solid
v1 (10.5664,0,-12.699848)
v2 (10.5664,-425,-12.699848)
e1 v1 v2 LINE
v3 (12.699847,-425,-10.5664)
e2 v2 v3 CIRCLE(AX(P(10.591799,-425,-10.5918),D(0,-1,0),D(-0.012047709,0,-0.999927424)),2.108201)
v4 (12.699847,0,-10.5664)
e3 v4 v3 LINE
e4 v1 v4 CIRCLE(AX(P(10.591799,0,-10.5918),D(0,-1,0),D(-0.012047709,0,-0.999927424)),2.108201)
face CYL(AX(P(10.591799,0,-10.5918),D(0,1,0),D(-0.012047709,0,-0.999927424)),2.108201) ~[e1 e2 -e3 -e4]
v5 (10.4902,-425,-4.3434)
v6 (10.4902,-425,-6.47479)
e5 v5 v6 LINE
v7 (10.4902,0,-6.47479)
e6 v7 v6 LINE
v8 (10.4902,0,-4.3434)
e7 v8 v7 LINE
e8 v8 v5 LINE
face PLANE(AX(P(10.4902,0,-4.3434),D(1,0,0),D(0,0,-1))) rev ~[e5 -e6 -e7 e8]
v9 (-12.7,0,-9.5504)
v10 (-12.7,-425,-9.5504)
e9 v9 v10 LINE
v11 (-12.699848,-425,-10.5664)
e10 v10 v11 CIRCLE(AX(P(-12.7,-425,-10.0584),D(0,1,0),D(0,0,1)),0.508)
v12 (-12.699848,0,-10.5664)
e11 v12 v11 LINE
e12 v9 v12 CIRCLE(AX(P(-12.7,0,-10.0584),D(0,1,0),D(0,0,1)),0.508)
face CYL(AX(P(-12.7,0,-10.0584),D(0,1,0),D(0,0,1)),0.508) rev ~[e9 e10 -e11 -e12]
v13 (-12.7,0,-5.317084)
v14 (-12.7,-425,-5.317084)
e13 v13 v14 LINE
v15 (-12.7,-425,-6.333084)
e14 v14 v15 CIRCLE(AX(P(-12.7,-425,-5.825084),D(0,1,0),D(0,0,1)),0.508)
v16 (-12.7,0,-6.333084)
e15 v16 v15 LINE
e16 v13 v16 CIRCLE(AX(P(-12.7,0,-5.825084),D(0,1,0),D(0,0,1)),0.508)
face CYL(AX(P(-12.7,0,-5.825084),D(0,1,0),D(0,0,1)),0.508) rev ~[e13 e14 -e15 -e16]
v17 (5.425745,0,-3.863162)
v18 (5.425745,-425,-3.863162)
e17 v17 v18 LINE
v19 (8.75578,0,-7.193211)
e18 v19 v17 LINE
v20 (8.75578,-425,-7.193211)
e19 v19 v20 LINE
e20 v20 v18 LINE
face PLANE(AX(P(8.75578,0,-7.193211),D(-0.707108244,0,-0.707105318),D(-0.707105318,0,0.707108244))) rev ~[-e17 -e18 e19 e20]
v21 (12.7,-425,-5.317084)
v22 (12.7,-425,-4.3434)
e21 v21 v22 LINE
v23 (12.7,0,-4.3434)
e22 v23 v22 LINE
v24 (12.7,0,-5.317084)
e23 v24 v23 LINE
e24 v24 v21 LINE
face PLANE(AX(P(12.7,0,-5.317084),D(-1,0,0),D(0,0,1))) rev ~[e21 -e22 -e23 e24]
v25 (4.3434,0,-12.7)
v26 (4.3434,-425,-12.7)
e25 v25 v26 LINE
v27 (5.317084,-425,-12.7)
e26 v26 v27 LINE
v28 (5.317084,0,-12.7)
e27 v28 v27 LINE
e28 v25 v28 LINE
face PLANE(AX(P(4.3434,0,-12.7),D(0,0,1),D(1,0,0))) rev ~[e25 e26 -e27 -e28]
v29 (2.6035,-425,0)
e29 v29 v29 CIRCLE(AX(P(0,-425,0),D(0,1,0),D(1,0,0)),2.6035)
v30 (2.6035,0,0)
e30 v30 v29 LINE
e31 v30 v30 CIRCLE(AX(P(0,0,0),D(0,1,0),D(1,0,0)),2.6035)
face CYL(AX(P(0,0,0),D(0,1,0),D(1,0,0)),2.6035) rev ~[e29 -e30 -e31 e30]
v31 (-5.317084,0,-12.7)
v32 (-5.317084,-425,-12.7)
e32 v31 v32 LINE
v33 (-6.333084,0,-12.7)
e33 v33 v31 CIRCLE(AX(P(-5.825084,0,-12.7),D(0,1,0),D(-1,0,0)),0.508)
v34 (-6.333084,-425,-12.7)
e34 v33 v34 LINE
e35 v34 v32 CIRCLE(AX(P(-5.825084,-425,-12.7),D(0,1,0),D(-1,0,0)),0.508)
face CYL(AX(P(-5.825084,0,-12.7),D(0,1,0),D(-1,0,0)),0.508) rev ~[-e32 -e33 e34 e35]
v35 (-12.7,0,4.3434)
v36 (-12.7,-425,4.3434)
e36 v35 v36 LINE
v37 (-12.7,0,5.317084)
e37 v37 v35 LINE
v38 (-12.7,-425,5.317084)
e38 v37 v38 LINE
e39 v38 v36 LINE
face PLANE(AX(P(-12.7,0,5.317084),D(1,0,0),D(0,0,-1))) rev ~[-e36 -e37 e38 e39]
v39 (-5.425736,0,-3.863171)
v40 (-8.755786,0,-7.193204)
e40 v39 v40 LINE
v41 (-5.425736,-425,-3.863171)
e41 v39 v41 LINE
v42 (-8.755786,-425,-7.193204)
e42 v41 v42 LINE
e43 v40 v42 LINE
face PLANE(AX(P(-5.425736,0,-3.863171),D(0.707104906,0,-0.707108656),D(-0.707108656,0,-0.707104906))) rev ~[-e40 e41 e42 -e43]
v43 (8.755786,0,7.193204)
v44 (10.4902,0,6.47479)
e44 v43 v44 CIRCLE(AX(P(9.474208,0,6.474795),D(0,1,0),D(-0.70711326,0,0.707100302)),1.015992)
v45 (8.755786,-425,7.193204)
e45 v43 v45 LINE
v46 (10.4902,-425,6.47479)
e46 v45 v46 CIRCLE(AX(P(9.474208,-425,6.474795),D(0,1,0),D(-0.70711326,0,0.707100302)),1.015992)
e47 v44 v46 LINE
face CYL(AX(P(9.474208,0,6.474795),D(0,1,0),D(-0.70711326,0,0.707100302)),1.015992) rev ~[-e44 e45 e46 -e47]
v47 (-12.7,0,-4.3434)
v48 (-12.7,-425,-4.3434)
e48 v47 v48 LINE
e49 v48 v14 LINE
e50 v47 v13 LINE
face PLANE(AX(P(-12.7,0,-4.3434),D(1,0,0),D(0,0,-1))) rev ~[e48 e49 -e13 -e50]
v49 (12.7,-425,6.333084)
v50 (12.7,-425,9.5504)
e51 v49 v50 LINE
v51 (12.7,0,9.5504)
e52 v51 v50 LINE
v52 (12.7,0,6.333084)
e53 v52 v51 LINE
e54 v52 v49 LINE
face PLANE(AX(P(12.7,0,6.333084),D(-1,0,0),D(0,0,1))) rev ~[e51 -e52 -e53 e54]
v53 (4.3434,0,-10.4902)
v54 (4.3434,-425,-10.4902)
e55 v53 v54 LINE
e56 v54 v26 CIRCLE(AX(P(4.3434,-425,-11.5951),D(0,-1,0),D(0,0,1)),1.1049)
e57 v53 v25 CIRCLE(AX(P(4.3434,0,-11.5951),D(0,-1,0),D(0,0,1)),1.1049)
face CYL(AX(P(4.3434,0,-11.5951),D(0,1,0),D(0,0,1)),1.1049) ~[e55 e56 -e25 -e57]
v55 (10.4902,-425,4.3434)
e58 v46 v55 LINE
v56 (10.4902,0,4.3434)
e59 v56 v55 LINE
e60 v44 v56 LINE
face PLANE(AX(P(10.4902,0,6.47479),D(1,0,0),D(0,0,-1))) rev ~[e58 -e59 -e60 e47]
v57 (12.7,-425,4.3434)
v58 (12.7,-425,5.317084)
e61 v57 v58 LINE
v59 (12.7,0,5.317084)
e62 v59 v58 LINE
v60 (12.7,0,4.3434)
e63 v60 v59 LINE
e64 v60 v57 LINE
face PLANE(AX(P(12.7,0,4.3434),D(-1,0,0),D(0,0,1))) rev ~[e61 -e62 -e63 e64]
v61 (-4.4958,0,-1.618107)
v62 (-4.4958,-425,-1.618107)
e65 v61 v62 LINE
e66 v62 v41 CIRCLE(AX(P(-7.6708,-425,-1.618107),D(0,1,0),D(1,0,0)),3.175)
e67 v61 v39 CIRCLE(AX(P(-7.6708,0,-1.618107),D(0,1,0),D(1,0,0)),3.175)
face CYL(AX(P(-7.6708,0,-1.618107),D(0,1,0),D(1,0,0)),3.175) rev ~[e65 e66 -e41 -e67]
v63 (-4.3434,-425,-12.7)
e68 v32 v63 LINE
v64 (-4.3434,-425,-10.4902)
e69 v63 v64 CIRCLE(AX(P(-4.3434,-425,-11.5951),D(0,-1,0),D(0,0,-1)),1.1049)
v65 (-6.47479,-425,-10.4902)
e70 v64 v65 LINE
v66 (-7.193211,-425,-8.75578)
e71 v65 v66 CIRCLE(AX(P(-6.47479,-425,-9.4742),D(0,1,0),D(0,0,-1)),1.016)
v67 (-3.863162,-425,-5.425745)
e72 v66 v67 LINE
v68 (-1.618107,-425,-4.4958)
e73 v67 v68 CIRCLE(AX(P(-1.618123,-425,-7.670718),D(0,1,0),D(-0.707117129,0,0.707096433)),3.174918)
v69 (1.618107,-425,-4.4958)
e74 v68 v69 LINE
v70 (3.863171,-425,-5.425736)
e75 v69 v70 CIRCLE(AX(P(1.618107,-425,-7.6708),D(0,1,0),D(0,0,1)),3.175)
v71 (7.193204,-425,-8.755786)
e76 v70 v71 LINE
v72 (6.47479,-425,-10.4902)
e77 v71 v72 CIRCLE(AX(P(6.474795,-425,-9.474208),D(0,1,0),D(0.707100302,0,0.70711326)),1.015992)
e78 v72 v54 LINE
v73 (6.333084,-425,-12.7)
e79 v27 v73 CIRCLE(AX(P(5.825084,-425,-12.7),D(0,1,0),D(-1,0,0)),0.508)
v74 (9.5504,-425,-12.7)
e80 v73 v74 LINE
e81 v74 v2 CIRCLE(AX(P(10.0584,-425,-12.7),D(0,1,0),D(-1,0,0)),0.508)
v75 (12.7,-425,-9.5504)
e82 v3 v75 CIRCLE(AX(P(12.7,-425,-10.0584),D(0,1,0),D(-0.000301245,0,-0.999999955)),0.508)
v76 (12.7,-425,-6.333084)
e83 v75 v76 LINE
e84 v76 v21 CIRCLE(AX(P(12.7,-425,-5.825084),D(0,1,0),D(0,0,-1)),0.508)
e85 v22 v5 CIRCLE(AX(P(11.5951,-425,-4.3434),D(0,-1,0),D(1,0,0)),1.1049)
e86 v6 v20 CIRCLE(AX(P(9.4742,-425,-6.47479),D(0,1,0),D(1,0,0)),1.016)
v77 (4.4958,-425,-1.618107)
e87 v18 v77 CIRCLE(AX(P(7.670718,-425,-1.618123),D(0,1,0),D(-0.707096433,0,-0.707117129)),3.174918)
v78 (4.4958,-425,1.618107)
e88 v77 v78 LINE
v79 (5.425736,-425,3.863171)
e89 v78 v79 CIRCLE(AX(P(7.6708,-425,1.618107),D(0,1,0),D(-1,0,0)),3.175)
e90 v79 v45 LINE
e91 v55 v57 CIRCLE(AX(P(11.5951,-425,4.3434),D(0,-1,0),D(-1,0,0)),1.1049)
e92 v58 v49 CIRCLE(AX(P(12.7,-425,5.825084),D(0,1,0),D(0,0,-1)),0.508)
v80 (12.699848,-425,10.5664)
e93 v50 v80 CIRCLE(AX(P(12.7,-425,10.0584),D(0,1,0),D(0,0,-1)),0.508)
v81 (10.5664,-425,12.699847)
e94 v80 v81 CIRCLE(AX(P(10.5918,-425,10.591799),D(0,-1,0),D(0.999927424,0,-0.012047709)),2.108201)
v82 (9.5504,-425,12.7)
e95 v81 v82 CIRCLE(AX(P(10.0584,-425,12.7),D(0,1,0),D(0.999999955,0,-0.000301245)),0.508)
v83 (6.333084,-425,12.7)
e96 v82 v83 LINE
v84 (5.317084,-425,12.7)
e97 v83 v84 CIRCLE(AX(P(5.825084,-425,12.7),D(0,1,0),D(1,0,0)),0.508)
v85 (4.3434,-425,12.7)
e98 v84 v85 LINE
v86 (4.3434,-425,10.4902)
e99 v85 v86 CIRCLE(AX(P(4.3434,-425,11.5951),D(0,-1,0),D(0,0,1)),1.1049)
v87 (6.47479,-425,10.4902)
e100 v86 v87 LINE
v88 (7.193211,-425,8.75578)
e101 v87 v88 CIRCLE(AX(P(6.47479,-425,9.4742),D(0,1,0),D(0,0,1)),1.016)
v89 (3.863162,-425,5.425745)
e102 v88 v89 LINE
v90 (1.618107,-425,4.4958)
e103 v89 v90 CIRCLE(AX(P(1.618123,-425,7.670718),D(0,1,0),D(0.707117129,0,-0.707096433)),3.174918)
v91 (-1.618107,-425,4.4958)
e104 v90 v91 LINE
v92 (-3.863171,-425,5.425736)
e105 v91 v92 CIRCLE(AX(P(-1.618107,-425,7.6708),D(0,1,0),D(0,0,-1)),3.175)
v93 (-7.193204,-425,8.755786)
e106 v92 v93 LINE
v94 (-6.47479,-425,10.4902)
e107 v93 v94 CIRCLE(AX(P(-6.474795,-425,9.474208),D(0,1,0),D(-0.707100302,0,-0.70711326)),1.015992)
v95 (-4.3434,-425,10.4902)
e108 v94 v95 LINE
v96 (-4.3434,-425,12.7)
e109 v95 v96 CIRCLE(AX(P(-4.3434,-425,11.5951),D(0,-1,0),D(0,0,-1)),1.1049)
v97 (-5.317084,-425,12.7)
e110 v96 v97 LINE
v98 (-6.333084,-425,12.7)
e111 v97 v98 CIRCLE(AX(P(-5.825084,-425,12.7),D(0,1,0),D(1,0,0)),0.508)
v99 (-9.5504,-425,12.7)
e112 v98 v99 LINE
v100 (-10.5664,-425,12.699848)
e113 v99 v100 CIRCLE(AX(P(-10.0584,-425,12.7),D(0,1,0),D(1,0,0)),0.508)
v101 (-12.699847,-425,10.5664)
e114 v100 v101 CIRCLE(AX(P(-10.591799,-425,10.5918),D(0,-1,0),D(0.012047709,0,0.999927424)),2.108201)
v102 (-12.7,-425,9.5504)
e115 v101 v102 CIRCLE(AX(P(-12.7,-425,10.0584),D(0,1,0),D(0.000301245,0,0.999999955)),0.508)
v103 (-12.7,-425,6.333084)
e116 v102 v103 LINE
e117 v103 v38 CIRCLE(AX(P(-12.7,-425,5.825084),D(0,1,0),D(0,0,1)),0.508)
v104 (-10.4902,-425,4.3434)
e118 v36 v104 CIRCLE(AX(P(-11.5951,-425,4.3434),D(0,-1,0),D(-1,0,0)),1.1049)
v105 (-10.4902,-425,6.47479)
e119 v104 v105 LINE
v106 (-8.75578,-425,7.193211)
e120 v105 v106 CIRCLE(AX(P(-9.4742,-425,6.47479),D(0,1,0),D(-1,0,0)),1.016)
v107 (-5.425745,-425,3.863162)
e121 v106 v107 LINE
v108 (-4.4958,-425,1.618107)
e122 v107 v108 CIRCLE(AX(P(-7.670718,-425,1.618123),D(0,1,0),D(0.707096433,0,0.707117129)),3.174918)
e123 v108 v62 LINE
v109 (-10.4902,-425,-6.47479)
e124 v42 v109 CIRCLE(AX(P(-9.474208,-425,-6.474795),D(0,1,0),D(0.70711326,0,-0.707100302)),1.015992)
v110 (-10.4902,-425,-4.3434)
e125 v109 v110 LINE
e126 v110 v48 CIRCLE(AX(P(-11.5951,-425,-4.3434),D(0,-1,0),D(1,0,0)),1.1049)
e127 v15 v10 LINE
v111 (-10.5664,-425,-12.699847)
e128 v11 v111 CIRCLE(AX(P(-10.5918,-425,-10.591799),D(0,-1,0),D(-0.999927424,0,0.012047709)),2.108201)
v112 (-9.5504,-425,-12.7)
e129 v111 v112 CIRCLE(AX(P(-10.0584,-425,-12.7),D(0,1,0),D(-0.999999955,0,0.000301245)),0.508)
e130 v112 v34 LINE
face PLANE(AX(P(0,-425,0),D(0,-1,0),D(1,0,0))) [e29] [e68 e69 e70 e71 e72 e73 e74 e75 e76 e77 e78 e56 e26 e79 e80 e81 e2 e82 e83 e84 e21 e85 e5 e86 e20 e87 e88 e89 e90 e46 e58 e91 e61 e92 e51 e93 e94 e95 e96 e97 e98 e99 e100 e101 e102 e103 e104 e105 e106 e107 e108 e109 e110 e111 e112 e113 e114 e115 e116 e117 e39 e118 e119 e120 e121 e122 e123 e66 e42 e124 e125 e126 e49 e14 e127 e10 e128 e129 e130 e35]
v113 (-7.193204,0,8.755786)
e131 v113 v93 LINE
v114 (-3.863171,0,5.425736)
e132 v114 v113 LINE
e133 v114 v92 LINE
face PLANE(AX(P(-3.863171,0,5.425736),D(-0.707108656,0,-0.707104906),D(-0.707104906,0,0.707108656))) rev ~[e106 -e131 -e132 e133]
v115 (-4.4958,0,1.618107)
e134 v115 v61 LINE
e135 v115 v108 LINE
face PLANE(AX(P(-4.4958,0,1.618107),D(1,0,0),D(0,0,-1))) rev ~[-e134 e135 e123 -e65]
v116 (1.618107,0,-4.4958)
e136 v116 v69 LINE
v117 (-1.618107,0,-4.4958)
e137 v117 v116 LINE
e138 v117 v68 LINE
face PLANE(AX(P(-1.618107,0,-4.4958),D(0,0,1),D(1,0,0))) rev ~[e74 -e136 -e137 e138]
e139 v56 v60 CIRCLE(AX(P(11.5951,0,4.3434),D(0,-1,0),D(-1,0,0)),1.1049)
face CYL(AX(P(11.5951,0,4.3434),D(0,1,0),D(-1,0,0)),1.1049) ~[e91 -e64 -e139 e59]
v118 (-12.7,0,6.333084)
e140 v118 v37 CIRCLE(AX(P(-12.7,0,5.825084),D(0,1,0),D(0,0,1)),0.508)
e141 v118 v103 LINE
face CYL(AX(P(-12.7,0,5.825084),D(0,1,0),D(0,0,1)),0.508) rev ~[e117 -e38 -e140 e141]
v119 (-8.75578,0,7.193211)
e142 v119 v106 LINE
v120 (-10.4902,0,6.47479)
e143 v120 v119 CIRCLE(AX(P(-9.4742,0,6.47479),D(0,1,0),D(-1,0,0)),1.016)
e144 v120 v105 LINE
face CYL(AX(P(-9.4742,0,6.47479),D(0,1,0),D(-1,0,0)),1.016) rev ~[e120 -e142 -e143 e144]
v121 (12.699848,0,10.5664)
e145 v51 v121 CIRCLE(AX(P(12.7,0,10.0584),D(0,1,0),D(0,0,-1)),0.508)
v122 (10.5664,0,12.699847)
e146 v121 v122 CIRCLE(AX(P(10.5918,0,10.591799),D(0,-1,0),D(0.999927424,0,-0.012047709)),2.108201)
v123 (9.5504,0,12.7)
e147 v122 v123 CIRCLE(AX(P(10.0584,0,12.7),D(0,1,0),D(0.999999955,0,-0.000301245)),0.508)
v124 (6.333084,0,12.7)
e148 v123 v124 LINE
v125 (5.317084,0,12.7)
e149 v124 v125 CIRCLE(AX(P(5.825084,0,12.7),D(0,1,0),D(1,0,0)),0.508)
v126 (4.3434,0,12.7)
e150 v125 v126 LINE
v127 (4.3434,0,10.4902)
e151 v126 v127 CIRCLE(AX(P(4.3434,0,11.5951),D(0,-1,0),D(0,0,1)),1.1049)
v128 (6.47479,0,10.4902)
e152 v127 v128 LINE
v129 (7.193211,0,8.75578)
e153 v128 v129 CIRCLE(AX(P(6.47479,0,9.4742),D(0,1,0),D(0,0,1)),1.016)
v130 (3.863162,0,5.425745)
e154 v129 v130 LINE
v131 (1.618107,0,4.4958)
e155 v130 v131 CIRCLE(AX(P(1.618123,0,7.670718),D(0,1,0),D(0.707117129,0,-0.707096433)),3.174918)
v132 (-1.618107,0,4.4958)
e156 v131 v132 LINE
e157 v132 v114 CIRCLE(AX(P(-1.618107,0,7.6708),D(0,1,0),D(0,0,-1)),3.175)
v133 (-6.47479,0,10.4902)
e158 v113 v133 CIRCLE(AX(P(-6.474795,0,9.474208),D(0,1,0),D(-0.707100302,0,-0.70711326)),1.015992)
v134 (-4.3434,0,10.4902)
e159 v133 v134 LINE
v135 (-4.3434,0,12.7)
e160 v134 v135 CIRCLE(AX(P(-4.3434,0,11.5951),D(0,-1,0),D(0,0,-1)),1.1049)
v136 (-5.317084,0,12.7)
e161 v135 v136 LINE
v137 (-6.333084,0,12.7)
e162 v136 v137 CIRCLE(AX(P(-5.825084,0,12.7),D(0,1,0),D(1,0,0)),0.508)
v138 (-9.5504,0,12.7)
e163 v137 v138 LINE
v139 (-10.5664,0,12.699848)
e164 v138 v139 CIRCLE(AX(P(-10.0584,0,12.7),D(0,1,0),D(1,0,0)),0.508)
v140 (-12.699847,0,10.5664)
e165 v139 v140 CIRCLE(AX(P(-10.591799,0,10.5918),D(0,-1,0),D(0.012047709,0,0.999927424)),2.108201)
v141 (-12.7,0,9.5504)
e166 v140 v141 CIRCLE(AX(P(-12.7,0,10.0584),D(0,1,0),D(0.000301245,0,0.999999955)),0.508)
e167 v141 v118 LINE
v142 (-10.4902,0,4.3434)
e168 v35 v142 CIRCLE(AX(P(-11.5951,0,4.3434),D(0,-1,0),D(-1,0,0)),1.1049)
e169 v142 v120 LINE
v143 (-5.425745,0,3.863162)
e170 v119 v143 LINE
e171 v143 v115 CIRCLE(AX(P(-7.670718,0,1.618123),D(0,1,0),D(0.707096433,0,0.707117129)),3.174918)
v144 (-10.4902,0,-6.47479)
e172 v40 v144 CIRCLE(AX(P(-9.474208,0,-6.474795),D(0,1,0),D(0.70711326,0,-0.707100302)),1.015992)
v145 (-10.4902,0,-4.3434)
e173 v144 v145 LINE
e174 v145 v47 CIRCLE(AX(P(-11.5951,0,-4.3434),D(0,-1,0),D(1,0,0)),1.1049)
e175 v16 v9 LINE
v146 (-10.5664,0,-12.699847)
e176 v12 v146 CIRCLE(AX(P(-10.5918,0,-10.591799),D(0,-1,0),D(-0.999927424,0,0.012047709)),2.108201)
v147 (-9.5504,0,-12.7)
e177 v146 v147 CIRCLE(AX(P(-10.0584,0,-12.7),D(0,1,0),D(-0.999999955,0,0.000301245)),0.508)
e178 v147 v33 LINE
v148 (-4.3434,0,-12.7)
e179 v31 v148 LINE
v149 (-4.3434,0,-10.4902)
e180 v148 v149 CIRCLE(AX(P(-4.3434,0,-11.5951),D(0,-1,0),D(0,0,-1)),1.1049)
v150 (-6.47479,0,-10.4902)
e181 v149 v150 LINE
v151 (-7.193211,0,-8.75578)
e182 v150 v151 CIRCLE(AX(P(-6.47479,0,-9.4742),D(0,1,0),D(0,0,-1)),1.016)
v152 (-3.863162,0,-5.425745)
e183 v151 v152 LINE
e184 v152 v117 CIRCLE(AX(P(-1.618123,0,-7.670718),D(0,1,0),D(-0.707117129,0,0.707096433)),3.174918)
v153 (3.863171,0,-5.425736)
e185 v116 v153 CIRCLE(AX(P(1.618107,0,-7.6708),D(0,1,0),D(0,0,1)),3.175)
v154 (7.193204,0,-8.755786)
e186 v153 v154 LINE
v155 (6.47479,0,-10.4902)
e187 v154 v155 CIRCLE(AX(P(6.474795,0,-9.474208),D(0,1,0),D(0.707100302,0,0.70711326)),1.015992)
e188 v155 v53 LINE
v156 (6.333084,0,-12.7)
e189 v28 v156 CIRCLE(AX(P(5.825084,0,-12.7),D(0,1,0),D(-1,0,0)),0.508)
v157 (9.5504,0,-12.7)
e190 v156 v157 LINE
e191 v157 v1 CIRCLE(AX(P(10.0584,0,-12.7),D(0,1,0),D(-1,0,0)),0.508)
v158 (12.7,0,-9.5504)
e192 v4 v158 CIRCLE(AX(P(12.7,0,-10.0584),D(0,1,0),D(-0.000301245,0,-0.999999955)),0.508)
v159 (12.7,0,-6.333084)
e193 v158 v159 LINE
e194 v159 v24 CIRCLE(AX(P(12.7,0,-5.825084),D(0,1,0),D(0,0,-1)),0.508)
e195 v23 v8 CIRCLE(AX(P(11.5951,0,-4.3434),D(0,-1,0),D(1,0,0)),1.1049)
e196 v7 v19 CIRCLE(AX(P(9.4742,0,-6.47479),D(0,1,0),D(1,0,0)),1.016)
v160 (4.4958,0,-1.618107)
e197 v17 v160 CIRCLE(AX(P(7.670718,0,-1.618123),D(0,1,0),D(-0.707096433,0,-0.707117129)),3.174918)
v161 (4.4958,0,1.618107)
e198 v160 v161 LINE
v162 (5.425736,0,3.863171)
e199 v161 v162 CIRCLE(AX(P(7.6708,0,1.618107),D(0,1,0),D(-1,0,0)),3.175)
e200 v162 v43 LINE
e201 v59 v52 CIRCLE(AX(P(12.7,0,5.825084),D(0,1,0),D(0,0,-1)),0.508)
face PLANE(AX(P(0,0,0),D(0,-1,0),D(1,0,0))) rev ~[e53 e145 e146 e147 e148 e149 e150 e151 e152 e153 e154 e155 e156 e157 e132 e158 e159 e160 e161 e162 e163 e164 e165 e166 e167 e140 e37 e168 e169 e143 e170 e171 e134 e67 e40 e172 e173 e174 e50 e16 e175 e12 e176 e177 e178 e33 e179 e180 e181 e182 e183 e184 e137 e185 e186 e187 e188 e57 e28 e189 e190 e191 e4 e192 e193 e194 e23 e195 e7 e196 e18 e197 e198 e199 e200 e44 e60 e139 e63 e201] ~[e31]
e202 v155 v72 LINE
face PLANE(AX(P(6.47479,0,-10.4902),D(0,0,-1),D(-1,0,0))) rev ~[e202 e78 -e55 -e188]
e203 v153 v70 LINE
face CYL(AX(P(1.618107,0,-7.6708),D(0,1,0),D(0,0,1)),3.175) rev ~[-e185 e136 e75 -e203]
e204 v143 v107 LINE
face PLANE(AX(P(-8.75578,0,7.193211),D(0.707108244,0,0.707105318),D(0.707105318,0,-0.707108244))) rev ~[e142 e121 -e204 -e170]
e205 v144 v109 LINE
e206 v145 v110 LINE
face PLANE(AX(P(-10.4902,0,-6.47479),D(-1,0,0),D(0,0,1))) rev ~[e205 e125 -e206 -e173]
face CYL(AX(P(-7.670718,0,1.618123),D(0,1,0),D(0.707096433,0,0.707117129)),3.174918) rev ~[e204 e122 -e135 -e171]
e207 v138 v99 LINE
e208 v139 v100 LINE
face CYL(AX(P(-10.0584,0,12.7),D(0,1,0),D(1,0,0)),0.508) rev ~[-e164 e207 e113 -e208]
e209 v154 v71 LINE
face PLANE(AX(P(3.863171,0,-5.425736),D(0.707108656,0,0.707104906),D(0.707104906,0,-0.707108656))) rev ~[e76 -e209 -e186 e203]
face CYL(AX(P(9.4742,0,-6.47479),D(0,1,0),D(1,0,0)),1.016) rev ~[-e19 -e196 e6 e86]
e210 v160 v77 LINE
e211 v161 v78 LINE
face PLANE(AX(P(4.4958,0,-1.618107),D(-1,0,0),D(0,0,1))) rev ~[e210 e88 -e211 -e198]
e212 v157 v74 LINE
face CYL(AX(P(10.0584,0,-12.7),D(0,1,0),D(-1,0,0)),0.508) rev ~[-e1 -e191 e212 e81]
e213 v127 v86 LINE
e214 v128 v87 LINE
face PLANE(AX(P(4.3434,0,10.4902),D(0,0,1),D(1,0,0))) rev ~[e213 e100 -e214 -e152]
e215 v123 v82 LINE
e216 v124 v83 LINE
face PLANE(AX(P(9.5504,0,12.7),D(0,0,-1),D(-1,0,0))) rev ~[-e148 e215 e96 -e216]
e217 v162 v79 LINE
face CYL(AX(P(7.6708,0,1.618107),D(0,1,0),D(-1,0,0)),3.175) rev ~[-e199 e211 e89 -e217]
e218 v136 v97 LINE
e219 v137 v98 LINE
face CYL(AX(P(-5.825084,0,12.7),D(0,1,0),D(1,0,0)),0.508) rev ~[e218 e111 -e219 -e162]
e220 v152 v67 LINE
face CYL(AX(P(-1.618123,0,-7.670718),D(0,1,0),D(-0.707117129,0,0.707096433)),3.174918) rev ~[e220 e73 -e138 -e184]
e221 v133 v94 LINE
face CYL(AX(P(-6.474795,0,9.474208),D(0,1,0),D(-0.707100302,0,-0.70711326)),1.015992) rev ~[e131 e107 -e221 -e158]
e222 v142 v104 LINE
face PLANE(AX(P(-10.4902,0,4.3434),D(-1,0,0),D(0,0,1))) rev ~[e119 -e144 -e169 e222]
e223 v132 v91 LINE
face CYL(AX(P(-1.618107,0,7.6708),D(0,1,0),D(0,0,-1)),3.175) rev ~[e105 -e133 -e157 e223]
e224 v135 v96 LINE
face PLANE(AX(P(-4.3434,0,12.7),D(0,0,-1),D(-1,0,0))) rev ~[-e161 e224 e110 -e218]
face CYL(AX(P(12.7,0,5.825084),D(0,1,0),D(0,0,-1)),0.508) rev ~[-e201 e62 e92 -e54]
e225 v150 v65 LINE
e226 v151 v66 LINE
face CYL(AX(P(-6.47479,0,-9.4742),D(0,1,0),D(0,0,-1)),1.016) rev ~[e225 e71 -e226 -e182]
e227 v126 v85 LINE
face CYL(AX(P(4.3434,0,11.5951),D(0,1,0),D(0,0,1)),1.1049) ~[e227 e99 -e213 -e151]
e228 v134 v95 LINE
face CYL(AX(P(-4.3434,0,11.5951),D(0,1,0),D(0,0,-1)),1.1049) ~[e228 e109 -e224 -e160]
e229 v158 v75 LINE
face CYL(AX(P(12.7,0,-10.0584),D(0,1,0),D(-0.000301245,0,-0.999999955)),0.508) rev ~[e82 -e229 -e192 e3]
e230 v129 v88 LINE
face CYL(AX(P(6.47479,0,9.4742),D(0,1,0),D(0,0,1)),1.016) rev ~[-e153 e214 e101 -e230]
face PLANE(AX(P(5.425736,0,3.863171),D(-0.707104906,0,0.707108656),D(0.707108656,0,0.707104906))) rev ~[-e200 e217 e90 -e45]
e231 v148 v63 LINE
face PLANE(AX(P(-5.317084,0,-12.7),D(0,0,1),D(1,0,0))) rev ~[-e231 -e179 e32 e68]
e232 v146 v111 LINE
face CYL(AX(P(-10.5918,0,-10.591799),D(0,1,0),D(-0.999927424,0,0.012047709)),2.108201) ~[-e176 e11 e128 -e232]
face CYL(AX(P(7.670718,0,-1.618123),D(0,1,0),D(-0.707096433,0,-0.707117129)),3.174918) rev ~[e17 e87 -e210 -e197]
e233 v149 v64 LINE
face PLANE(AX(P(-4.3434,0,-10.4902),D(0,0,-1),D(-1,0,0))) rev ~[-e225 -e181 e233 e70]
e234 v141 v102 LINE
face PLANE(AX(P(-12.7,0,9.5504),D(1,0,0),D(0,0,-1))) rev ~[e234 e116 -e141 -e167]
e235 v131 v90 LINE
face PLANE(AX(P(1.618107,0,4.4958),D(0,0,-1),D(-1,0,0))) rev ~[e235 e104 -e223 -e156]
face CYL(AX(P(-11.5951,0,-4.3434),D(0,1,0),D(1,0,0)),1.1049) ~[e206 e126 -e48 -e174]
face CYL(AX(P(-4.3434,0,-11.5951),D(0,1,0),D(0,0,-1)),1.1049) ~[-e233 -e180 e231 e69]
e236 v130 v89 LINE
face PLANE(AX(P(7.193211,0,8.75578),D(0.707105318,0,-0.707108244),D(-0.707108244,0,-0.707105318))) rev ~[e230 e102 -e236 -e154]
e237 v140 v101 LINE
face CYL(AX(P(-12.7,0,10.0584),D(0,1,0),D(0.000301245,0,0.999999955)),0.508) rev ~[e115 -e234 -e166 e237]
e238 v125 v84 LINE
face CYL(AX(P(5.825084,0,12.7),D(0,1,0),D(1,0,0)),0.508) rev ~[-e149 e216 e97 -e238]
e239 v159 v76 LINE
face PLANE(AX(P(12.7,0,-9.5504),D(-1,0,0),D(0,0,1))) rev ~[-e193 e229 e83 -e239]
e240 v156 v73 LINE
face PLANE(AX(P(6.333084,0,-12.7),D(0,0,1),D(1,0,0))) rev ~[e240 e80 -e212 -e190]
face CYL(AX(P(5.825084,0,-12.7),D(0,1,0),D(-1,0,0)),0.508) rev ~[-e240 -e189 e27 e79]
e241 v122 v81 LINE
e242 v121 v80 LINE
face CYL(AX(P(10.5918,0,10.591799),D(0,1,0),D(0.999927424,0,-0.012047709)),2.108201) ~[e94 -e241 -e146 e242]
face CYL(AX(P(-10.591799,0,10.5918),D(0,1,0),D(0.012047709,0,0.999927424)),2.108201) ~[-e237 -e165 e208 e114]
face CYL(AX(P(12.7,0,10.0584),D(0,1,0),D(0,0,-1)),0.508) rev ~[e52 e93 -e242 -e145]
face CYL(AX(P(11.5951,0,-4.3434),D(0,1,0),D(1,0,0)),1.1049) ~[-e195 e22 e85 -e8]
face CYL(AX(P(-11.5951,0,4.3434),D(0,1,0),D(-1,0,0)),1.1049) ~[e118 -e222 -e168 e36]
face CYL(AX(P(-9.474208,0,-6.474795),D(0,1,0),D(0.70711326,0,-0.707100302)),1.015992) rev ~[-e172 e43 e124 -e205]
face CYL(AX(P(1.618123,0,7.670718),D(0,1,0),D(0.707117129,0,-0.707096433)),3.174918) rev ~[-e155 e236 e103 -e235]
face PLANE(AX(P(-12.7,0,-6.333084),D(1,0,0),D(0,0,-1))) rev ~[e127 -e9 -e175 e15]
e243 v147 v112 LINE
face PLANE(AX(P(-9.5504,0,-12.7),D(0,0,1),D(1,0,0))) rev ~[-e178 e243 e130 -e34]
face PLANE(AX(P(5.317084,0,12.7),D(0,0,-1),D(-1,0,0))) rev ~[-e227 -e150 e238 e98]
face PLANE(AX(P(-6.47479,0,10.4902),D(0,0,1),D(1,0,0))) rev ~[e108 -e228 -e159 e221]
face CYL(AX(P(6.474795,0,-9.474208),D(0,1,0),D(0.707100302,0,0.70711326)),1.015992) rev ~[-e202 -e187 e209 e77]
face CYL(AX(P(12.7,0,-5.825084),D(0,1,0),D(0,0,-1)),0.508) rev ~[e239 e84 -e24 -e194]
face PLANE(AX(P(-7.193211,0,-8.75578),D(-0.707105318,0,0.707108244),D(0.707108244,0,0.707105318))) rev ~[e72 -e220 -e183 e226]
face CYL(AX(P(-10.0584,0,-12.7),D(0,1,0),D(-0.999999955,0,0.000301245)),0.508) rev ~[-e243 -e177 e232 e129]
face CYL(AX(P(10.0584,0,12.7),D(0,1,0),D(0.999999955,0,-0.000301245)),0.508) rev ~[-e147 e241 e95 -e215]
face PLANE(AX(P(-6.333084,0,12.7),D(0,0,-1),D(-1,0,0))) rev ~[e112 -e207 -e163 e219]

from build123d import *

# Parameters (mm, degrees)
F1_DEPTH = 425


# Not quite as in the source:
# - ends of sketch curves that miss each other by under 0.0002 mm in the source are joined


with BuildPart() as f1:
    # F0 (on Front) → F1 (new body)
    with BuildSketch(Plane.XZ):
        with BuildLine():
            ThreePointArc((-12.7, -9.5504), (-12.1920000057, -10.0583238), (-12.6998476, -10.5663999771))
            ThreePointArc((-12.6998476, -10.5663999771), (-12.0825225161, -12.0825225161), (-10.5664000074, -12.6998469825))
            ThreePointArc((-10.5664000074, -12.6998469825), (-10.0583238, -12.1920000057), (-9.5504, -12.7))
            Line((-9.5504, -12.7), (-6.3330836, -12.7))
            ThreePointArc((-6.3330836, -12.7), (-5.8250836, -12.192), (-5.3170836, -12.7))
            Line((-5.3170836, -12.7), (-4.3434, -12.7))
            ThreePointArc((-4.3434, -12.7), (-3.2385, -11.5951), (-4.3434, -10.4902))
            Line((-4.3434, -10.4902), (-6.4747902, -10.4902))
            ThreePointArc((-6.4747902, -10.4902), (-7.413451805, -9.8630063673), (-7.1932106897, -8.7557795103))
            Line((-7.1932106897, -8.7557795103), (-3.8631622, -5.4257448))
            ThreePointArc((-3.8631622, -5.4257448), (-2.8331268978, -4.7374824843), (-1.618107, -4.4958))
            Line((-1.618107, -4.4958), (1.618107, -4.4958))
            ThreePointArc((1.618107, -4.4958), (2.8331268978, -4.7374824843), (3.8631710303, -5.4257359697))
            Line((3.8631710303, -5.4257359697), (7.1932038, -8.7557864))
            ThreePointArc((7.1932038, -8.7557864), (7.413451805, -9.8630063673), (6.4747902, -10.4902))
            Line((6.4747902, -10.4902), (4.3434, -10.4902))
            ThreePointArc((4.3434, -10.4902), (3.2385, -11.5951), (4.3434, -12.7))
            Line((4.3434, -12.7), (5.3170836, -12.7))
            ThreePointArc((5.3170836, -12.7), (5.8250836, -12.192), (6.3330836, -12.7))
            Line((6.3330836, -12.7), (9.5504, -12.7))
            ThreePointArc((9.5504, -12.7), (10.0583238, -12.1920000057), (10.5663999771, -12.6998476))
            ThreePointArc((10.5663999771, -12.6998476), (12.0825225161, -12.0825225161), (12.6998469825, -10.5664000074))
            ThreePointArc((12.6998469825, -10.5664000074), (12.1920000057, -10.0583238), (12.7, -9.5504))
            Line((12.7, -9.5504), (12.7, -6.3330836))
            ThreePointArc((12.7, -6.3330836), (12.192, -5.8250836), (12.7, -5.3170836))
            Line((12.7, -5.3170836), (12.7, -4.3434))
            ThreePointArc((12.7, -4.3434), (11.5951, -3.2385), (10.4902, -4.3434))
            Line((10.4902, -4.3434), (10.4902, -6.4747902))
            ThreePointArc((10.4902, -6.4747902), (9.8630063673, -7.413451805), (8.7557795103, -7.1932106897))
            Line((8.7557795103, -7.1932106897), (5.4257448, -3.8631622))
            ThreePointArc((5.4257448, -3.8631622), (4.7374824843, -2.8331268978), (4.4958, -1.618107))
            Line((4.4958, -1.618107), (4.4958, 1.618107))
            ThreePointArc((4.4958, 1.618107), (4.7374824843, 2.8331268978), (5.4257359697, 3.8631710303))
            Line((5.4257359697, 3.8631710303), (8.7557864, 7.1932038))
            ThreePointArc((8.7557864, 7.1932038), (9.8630063673, 7.413451805), (10.4902, 6.4747902))
            Line((10.4902, 6.4747902), (10.4902, 4.3434))
            ThreePointArc((10.4902, 4.3434), (11.5951, 3.2385), (12.7, 4.3434))
            Line((12.7, 4.3434), (12.7, 5.3170836))
            ThreePointArc((12.7, 5.3170836), (12.192, 5.8250836), (12.7, 6.3330836))
            Line((12.7, 6.3330836), (12.7, 9.5504))
            ThreePointArc((12.7, 9.5504), (12.1920000057, 10.0583238), (12.6998476, 10.5663999771))
            ThreePointArc((12.6998476, 10.5663999771), (12.0825225161, 12.0825225161), (10.5664000074, 12.6998469825))
            ThreePointArc((10.5664000074, 12.6998469825), (10.0583238, 12.1920000057), (9.5504, 12.7))
            Line((9.5504, 12.7), (6.3330836, 12.7))
            ThreePointArc((6.3330836, 12.7), (5.8250836, 12.192), (5.3170836, 12.7))
            Line((5.3170836, 12.7), (4.3434, 12.7))
            ThreePointArc((4.3434, 12.7), (3.2385, 11.5951), (4.3434, 10.4902))
            Line((4.3434, 10.4902), (6.4747902, 10.4902))
            ThreePointArc((6.4747902, 10.4902), (7.413451805, 9.8630063673), (7.1932106897, 8.7557795103))
            Line((7.1932106897, 8.7557795103), (3.8631622, 5.4257448))
            ThreePointArc((3.8631622, 5.4257448), (2.8331268978, 4.7374824843), (1.618107, 4.4958))
            Line((1.618107, 4.4958), (-1.618107, 4.4958))
            ThreePointArc((-1.618107, 4.4958), (-2.8331268978, 4.7374824843), (-3.8631710303, 5.4257359697))
            Line((-3.8631710303, 5.4257359697), (-7.1932038, 8.7557864))
            ThreePointArc((-7.1932038, 8.7557864), (-7.413451805, 9.8630063673), (-6.4747902, 10.4902))
            Line((-6.4747902, 10.4902), (-4.3434, 10.4902))
            ThreePointArc((-4.3434, 10.4902), (-3.2385, 11.5951), (-4.3434, 12.7))
            Line((-4.3434, 12.7), (-5.3170836, 12.7))
            ThreePointArc((-5.3170836, 12.7), (-5.8250836, 12.192), (-6.3330836, 12.7))
            Line((-6.3330836, 12.7), (-9.5504, 12.7))
            ThreePointArc((-9.5504, 12.7), (-10.0583238, 12.1920000057), (-10.5663999771, 12.6998476))
            ThreePointArc((-10.5663999771, 12.6998476), (-12.0825225161, 12.0825225161), (-12.6998469825, 10.5664000074))
            ThreePointArc((-12.6998469825, 10.5664000074), (-12.1920000057, 10.0583238), (-12.7, 9.5504))
            Line((-12.7, 9.5504), (-12.7, 6.3330836))
            ThreePointArc((-12.7, 6.3330836), (-12.192, 5.8250836), (-12.7, 5.3170836))
            Line((-12.7, 5.3170836), (-12.7, 4.3434))
            ThreePointArc((-12.7, 4.3434), (-11.5951, 3.2385), (-10.4902, 4.3434))
            Line((-10.4902, 4.3434), (-10.4902, 6.4747902))
            ThreePointArc((-10.4902, 6.4747902), (-9.8630063673, 7.413451805), (-8.7557795103, 7.1932106897))
            Line((-8.7557795103, 7.1932106897), (-5.4257448, 3.8631622))
            ThreePointArc((-5.4257448, 3.8631622), (-4.7374824843, 2.8331268978), (-4.4958, 1.618107))
            Line((-4.4958, 1.618107), (-4.4958, -1.618107))
            ThreePointArc((-4.4958, -1.618107), (-4.7374824843, -2.8331268978), (-5.4257359697, -3.8631710303))
            Line((-5.4257359697, -3.8631710303), (-8.7557864, -7.1932038))
            ThreePointArc((-8.7557864, -7.1932038), (-9.8630063673, -7.413451805), (-10.4902, -6.4747902))
            Line((-10.4902, -6.4747902), (-10.4902, -4.3434))
            ThreePointArc((-10.4902, -4.3434), (-11.5951, -3.2385), (-12.7, -4.3434))
            Line((-12.7, -4.3434), (-12.7, -5.3170836))
            ThreePointArc((-12.7, -5.3170836), (-12.192, -5.8250836), (-12.7, -6.3330836))
            Line((-12.7, -6.3330836), (-12.7, -9.5504))
        make_face()
        with BuildLine():
            ThreePointArc((-2.6035, 0), (0, 2.6035), (2.6035, 0))
            ThreePointArc((2.6035, 0), (0, -2.6035), (-2.6035, 0))
        make_face(mode=Mode.SUBTRACT)
    extrude(amount=F1_DEPTH)


solid = f1.part
